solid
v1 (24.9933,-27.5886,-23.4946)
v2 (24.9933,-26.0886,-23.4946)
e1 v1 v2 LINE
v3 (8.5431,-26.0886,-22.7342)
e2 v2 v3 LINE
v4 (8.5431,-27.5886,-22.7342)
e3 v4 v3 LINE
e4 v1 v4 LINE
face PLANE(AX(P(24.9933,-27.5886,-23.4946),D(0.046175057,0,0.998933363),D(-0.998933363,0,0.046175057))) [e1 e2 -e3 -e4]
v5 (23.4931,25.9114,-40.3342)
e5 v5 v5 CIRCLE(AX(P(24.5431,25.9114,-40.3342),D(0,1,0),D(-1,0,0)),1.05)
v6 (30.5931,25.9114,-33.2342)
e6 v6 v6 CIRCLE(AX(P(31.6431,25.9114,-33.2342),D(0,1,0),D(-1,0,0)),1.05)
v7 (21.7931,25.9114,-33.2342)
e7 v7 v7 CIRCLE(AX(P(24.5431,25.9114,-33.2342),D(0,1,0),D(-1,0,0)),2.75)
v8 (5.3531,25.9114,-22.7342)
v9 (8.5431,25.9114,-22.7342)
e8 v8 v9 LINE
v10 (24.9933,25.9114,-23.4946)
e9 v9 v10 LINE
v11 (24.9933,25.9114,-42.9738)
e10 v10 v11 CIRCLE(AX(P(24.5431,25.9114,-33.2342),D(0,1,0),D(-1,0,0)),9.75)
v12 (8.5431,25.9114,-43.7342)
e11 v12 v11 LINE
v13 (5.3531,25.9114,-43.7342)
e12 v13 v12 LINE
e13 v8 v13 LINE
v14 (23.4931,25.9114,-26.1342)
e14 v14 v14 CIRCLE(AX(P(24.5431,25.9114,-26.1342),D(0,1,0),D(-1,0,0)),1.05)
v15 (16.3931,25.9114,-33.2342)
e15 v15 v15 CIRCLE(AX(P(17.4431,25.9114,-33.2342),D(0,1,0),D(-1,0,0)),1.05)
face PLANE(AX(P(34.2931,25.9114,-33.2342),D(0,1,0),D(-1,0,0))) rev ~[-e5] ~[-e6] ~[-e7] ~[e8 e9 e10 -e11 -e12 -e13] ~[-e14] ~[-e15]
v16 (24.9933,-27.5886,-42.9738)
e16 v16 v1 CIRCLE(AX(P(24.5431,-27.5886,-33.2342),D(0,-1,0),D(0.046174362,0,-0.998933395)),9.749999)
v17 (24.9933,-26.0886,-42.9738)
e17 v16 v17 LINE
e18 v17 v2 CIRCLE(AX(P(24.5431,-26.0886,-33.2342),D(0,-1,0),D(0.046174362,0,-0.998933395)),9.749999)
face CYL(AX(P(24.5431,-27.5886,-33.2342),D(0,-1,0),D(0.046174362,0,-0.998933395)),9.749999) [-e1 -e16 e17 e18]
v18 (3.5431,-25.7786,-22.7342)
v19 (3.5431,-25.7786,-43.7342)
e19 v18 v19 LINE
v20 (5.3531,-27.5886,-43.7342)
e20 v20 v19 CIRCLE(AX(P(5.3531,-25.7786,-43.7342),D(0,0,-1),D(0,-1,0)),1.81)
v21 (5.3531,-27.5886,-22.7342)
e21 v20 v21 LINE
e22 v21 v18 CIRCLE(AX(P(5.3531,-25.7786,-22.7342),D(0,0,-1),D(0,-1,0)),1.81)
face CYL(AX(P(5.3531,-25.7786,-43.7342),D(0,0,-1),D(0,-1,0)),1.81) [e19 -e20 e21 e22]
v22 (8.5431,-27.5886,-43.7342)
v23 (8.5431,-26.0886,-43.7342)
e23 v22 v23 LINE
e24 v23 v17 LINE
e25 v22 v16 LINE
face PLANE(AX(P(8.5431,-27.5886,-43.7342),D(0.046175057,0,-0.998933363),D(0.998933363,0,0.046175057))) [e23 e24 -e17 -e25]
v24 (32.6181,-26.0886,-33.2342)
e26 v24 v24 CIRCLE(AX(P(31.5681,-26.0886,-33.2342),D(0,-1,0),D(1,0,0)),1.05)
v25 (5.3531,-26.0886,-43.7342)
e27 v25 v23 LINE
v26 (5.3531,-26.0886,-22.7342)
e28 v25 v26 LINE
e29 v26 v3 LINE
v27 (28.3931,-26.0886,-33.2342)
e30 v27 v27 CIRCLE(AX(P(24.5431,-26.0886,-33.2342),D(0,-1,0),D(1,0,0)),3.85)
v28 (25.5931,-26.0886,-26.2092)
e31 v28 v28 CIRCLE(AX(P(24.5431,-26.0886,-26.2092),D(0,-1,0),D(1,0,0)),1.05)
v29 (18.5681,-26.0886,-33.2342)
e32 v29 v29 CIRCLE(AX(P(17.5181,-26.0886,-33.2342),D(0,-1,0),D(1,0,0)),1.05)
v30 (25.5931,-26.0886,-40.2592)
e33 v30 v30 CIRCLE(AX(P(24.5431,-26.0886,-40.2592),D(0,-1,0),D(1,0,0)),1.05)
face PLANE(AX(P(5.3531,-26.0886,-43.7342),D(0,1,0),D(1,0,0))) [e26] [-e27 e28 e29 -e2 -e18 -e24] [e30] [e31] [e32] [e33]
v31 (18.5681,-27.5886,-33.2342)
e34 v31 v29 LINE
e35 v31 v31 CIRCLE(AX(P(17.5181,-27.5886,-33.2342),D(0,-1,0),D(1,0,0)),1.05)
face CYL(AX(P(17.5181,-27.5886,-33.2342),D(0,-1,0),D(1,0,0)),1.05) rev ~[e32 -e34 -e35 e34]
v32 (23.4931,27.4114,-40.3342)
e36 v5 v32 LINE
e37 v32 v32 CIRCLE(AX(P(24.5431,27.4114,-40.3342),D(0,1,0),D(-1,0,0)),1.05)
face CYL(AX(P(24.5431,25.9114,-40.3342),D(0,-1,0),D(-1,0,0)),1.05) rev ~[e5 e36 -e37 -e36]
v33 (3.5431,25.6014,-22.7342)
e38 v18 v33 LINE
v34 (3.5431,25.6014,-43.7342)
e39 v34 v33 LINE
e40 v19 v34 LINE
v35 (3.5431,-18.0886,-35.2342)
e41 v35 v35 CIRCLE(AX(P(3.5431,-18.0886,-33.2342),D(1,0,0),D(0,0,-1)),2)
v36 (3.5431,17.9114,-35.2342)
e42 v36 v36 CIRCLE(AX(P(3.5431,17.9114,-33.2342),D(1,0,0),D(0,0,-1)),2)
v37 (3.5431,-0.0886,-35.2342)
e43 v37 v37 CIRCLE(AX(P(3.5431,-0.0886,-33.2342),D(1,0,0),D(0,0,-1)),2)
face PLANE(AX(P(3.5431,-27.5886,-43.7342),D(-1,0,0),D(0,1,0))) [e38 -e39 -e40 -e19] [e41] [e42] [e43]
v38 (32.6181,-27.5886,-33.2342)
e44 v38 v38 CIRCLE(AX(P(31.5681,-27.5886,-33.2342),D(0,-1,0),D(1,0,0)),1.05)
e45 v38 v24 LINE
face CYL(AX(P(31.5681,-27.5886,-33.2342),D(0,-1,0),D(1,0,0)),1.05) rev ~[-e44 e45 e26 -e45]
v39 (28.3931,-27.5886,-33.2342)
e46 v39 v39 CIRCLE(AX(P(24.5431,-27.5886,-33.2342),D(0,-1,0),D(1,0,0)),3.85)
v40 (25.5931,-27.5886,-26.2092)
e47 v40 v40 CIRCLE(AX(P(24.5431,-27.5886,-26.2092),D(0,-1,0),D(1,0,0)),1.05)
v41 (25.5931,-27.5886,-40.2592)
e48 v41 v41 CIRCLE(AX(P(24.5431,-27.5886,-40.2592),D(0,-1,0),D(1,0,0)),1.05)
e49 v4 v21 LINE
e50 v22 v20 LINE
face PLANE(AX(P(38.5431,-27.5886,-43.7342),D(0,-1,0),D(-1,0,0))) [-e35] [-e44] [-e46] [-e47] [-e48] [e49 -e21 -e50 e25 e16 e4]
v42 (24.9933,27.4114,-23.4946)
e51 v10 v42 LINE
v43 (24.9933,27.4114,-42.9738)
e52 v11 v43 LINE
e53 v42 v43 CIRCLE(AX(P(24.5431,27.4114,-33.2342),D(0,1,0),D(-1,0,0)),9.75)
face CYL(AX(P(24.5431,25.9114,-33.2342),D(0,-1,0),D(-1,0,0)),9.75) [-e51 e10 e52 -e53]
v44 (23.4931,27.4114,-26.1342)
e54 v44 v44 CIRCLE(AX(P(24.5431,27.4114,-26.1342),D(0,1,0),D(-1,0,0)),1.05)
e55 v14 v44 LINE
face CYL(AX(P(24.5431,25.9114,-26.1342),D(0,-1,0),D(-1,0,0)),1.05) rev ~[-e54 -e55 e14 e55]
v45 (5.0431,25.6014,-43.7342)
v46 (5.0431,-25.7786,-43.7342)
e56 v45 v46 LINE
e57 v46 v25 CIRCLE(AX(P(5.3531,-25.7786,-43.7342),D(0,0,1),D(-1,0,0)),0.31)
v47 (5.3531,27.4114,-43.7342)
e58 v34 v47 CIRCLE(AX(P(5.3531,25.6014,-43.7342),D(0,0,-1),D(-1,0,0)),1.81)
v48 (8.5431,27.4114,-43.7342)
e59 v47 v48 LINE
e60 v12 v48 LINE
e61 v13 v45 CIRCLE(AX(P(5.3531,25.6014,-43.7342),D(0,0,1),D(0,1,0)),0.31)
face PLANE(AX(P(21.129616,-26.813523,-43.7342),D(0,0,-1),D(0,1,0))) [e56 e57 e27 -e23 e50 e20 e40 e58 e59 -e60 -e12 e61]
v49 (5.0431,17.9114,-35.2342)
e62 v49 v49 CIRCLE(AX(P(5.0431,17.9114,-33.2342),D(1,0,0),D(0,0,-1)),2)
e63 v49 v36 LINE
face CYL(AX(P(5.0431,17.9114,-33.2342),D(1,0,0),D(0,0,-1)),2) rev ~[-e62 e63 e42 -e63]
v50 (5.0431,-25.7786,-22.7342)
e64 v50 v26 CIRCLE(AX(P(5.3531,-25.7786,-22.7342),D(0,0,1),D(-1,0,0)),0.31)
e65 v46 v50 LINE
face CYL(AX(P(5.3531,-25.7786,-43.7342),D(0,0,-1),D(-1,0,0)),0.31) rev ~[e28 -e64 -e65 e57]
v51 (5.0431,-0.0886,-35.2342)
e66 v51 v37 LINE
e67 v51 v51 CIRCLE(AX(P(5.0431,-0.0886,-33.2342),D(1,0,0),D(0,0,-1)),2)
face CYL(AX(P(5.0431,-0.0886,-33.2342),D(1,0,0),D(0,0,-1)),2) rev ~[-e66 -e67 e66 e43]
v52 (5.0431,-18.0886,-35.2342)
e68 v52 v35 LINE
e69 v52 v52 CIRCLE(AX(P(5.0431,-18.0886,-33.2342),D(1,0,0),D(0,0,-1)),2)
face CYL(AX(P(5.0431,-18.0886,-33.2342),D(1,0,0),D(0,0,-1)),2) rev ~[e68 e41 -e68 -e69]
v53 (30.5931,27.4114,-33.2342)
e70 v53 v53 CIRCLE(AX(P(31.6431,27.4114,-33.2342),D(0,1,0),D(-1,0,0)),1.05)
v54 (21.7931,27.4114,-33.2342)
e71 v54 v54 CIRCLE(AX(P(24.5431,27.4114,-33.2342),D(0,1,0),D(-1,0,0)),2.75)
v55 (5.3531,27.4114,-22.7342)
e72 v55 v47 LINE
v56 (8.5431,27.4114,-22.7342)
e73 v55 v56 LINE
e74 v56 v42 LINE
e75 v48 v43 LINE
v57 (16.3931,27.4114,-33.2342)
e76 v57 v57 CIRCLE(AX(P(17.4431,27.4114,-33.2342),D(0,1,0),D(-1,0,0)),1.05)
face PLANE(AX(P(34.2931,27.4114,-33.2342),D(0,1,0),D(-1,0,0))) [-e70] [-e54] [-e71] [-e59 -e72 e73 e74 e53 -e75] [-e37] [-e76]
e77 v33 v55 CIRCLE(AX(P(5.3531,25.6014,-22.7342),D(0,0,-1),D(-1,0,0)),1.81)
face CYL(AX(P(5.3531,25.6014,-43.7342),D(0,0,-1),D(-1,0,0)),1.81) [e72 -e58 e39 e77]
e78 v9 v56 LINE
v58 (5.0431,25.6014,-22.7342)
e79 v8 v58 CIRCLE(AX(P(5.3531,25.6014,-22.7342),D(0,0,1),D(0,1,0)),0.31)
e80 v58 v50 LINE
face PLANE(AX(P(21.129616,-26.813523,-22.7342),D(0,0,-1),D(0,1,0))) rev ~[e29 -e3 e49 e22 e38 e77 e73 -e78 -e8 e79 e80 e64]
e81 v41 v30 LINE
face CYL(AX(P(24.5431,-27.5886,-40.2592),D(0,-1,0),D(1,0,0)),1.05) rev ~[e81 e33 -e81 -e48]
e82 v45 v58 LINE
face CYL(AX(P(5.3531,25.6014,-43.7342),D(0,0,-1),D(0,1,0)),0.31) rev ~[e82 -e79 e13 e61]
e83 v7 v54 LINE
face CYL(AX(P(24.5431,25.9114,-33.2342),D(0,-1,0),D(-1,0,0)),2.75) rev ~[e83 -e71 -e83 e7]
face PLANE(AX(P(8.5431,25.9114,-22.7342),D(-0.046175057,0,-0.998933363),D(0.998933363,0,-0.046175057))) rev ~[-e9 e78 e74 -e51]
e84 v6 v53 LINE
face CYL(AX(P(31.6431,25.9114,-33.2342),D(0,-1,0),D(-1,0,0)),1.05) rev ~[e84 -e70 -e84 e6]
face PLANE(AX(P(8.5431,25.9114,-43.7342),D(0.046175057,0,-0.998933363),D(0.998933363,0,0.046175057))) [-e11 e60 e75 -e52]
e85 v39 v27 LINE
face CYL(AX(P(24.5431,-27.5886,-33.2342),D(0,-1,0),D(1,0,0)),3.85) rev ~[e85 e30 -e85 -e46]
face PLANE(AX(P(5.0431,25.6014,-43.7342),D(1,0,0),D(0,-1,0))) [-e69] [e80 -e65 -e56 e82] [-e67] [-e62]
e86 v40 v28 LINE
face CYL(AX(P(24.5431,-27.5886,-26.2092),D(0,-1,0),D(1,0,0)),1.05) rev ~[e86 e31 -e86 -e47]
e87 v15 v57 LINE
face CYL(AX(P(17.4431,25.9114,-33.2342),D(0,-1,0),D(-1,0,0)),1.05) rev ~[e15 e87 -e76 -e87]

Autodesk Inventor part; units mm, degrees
ref_plane "YZ Plane" through (0, 0, 0) normal (1, 0, 0) x (0, 1, 0)
ref_plane "Work Plane1" through (34.2931, 25.9114, -33.2342) normal (0, 1, 0) x (-1, 0, 0)
sketch "Sketch2" plane through (34.2931, 25.9114, -33.2342) normal (0, 1, 0) x (-1, 0, 0)
  circle A0 centre (9.75, 7.1) radius 0.7835
  circle A1 centre (16.85, 0) radius 0.7835
  circle A2 centre (9.75, -7.1) radius 0.7835
  circle A3 centre (2.65, 0) radius 0.7835
  circle A4 centre (4.7295, -5.0205) radius 0.7835
  circle A5 centre (14.7705, -5.0205) radius 0.7835
  circle A6 centre (14.7705, 5.0205) radius 0.7835
  circle A7 centre (4.7295, 5.0205) radius 0.7835
  circle A8 centre (9.75, 0) radius 3.8
  circle A9 centre (9.75, 0) radius 9.75
  circle A10 centre (9.75, 0) radius 2.75
  line L0 (30.75, -10.5) -> (30.75, 10.5)
  line L1 (30.75, -10.5) -> (25.75, -10.5)
  line L2 (30.75, 10.5) -> (25.75, 10.5)
  line L3 (25.75, -10.5) -> (9.2998, -9.7396)
  line L4 (25.75, 10.5) -> (9.2998, 9.7396)
  circle A11 centre (16.85, 0) radius 1.05
  circle A12 centre (9.75, 7.1) radius 1.05
  circle A13 centre (2.65, 0) radius 1.05
  circle A14 centre (9.75, -7.1) radius 1.05
  point P0 (34.2931, 33.2342)
  point P1 (30.75, 0)
  dimension "d2" = 5.5
  dimension "d4" = 21
  dimension "d5" = 5
  dimension "d6" = 21
  dimension "d37" = 2.1
extrude "Plate2" add sketch "Sketch2" along normal blind 1.5 contours A4 | A5 | A6 | A7 | A8 | A9 | A9 L4 L2 L0 L1 L3
sketch "Sketch3" plane through (5.0431, 27.4114, -43.7342) normal (-1, 0, 0) x (0, -1, 0)
  line L0 (0, 21) -> (0, 0)
  line L1 (0, 0) -> (55, 0)
  line L2 (55, 0) -> (55, 21)
  line L3 (55, 21) -> (0, 21)
edge flange "Flange1" height 55 angle 90 thickness 1.5 bend radius 0.31 thickness toward (-1, 0, 0) relief tear relief width 1.5 relief depth 0.75 edges at (3.5431, 25.9114, -33.2342) wall of the first edge with corners at (5.0431, 27.4114, -22.7342) (5.0431, 27.4114, -43.7342) (5.0431, -27.5886, -43.7342) (5.0431, -27.5886, -22.7342)
bend "Bend1"
corner "Corner1"
sketch "Sketch4" plane through (3.5431, -26.0886, -43.7342) normal (0, -1, 0) x (1, 0, 0)
  line L0 (0, 21) -> (0, 0)
  line L1 (0, 0) -> (35, 0)
  line L2 (35, 0) -> (35, 21)
  line L3 (35, 21) -> (0, 21)
edge flange "Flange2" height 35 angle 90 thickness 1.5 bend radius 0.31 thickness toward (0, -1, 0) relief tear relief width 1.5 relief depth 0.75 edges at (5.0431, -27.5886, -33.2342) wall of the first edge with corners at (3.5431, -26.0886, -22.7342) (3.5431, -26.0886, -43.7342) (38.5431, -26.0886, -43.7342) (38.5431, -26.0886, -22.7342)
bend "Bend2"
corner "Corner2"
sketch "Sketch5" plane through (38.5431, -27.5886, -43.7342) normal (0, -1, 0) x (1, 0, 0)
  circle A0 centre (-14, 10.5) radius 3.85 projected
  point P0 (-38.5431, 43.7342)
extrude "Cut1" cut sketch "Sketch5" against normal blind 1.5
sketch "Sketch6" plane through (38.5431, -27.5886, -43.7342) normal (0, -1, 0) x (1, 0, 0)
  line L0 (-33.19, 0) -> (-33.19, 21) projected
  line L1 (-30, 21) -> (-33.19, 21) projected
  line L2 (-13.5498, 20.2396) -> (-30, 21) projected
  arc A0 (-13.5498, 0.7604) -> (-13.5498, 20.2396) centre (-14, 10.5) ccw projected
  line L3 (-30, 0) -> (-13.5498, 0.7604) projected
  line L4 (-33.19, 0) -> (-30, 0) projected
  line L5 (-90, -199.5) -> (-90, 50.5) projected
  line L6 (220, -199.5) -> (-90, -199.5) projected
  circle A1 centre (-14, 17.525) radius 0.7835 projected
  circle A2 centre (-6.975, 10.5) radius 0.7835 projected
  circle A3 centre (-14, 3.475) radius 0.7835 projected
  circle A4 centre (-21.025, 10.5) radius 0.7835 projected
  circle A5 centre (-6.975, 10.5) radius 1.05
  circle A6 centre (-14, 17.525) radius 1.05
  circle A7 centre (-21.025, 10.5) radius 1.05
  circle A8 centre (-14, 3.475) radius 1.05
  line L7 (-33.19, 21) -> (0, 21) projected
  line L8 (0, 21) -> (0, 0) projected
  line L9 (0, 0) -> (-33.19, 0) projected
  line L10 (220, -199.5) -> (220, 50.5) projected
  line L11 (220, 50.5) -> (-90, 50.5) projected
  point P0 (-38.5431, 43.7342)
  dimension "d38" = 2.1
extrude "Cut2" cut sketch "Sketch6" against normal blind 1.5 contours L3 A0 L2 L7 L8 L9 | A1 | A2 | A3 | A4 | A5 | A6 | A7 | A8
ref_plane "작업 평면2" through (3.5431, 25.6014, -33.2342) normal (0, 0, 1) x (1, 0, 0)
sketch "Sketch7" plane through (5.0431, 25.6014, -22.7342) normal (1, 0, 0) x (0, 0, -1)
  line L0 (0, -51.38) -> (21, -51.38) projected
  line L1 (21, 0) -> (21, -51.38) projected
  line L2 (21, 0) -> (0, 0) projected
  line L3 (0, 0) -> (0, -51.38) projected
  line L4 (10.5, 0) -> (10.5, -51.38) construction
  circle A0 centre (10.5, -25.69) radius 2
  circle A1 centre (10.5, -7.69) radius 2
  circle A2 centre (10.5, -43.69) radius 2
  point P0 (-22.7342, -25.6014)
  dimension "d32" = 18
  dimension "d33" = 18
  dimension "d34" = 4
extrude "Cut3" cut sketch "Sketch7" against normal blind 1.5 contours A0 | A1 | A2
equation "\"d28\" = Thickness"
equation "\"d30\" = Thickness"
equation "\"d33\" = d32"
equation "\"d35\" = Thickness"
equation "\"d7\" = Thickness"
equation "\"d8\" = BendReliefWidth"
equation "\"d9\" = BendReliefDepth"
equation "\"d10\" = MinimumRemnant"
equation "\"d11\" = TransitionRadius"
equation "\"d14\" = BendRadius"
equation "\"d15\" = CornerReliefSize"
equation "\"d16\" = GapSize"
equation "\"d17\" = JacobiRadiusSize"
equation "\"d18\" = BendReliefWidth"
equation "\"d19\" = BendReliefDepth"
equation "\"d20\" = MinimumRemnant"
equation "\"d21\" = TransitionRadius"
equation "\"d24\" = BendRadius"
equation "\"d25\" = CornerReliefSize"
equation "\"d26\" = GapSize"
equation "\"d27\" = JacobiRadiusSize"
equation "\"BendReliefWidth\" = Thickness"
equation "\"BendReliefDepth\" = 0.5 * Thickness"
equation "\"CornerReliefSize\" = 4 * Thickness"
equation "\"MinimumRemnant\" = 2 * Thickness"
equation "\"TransitionRadius\" = BendRadius"
equation "\"JacobiRadiusSize\" = BendRadius"
equation "\"GapSize\" = Thickness"
equation "\"Thickness\" = 1.5"
equation "\"BendRadius\" = 0.31"
properties part number "ㄷ_frame_1" material "Aluminum 6061"
